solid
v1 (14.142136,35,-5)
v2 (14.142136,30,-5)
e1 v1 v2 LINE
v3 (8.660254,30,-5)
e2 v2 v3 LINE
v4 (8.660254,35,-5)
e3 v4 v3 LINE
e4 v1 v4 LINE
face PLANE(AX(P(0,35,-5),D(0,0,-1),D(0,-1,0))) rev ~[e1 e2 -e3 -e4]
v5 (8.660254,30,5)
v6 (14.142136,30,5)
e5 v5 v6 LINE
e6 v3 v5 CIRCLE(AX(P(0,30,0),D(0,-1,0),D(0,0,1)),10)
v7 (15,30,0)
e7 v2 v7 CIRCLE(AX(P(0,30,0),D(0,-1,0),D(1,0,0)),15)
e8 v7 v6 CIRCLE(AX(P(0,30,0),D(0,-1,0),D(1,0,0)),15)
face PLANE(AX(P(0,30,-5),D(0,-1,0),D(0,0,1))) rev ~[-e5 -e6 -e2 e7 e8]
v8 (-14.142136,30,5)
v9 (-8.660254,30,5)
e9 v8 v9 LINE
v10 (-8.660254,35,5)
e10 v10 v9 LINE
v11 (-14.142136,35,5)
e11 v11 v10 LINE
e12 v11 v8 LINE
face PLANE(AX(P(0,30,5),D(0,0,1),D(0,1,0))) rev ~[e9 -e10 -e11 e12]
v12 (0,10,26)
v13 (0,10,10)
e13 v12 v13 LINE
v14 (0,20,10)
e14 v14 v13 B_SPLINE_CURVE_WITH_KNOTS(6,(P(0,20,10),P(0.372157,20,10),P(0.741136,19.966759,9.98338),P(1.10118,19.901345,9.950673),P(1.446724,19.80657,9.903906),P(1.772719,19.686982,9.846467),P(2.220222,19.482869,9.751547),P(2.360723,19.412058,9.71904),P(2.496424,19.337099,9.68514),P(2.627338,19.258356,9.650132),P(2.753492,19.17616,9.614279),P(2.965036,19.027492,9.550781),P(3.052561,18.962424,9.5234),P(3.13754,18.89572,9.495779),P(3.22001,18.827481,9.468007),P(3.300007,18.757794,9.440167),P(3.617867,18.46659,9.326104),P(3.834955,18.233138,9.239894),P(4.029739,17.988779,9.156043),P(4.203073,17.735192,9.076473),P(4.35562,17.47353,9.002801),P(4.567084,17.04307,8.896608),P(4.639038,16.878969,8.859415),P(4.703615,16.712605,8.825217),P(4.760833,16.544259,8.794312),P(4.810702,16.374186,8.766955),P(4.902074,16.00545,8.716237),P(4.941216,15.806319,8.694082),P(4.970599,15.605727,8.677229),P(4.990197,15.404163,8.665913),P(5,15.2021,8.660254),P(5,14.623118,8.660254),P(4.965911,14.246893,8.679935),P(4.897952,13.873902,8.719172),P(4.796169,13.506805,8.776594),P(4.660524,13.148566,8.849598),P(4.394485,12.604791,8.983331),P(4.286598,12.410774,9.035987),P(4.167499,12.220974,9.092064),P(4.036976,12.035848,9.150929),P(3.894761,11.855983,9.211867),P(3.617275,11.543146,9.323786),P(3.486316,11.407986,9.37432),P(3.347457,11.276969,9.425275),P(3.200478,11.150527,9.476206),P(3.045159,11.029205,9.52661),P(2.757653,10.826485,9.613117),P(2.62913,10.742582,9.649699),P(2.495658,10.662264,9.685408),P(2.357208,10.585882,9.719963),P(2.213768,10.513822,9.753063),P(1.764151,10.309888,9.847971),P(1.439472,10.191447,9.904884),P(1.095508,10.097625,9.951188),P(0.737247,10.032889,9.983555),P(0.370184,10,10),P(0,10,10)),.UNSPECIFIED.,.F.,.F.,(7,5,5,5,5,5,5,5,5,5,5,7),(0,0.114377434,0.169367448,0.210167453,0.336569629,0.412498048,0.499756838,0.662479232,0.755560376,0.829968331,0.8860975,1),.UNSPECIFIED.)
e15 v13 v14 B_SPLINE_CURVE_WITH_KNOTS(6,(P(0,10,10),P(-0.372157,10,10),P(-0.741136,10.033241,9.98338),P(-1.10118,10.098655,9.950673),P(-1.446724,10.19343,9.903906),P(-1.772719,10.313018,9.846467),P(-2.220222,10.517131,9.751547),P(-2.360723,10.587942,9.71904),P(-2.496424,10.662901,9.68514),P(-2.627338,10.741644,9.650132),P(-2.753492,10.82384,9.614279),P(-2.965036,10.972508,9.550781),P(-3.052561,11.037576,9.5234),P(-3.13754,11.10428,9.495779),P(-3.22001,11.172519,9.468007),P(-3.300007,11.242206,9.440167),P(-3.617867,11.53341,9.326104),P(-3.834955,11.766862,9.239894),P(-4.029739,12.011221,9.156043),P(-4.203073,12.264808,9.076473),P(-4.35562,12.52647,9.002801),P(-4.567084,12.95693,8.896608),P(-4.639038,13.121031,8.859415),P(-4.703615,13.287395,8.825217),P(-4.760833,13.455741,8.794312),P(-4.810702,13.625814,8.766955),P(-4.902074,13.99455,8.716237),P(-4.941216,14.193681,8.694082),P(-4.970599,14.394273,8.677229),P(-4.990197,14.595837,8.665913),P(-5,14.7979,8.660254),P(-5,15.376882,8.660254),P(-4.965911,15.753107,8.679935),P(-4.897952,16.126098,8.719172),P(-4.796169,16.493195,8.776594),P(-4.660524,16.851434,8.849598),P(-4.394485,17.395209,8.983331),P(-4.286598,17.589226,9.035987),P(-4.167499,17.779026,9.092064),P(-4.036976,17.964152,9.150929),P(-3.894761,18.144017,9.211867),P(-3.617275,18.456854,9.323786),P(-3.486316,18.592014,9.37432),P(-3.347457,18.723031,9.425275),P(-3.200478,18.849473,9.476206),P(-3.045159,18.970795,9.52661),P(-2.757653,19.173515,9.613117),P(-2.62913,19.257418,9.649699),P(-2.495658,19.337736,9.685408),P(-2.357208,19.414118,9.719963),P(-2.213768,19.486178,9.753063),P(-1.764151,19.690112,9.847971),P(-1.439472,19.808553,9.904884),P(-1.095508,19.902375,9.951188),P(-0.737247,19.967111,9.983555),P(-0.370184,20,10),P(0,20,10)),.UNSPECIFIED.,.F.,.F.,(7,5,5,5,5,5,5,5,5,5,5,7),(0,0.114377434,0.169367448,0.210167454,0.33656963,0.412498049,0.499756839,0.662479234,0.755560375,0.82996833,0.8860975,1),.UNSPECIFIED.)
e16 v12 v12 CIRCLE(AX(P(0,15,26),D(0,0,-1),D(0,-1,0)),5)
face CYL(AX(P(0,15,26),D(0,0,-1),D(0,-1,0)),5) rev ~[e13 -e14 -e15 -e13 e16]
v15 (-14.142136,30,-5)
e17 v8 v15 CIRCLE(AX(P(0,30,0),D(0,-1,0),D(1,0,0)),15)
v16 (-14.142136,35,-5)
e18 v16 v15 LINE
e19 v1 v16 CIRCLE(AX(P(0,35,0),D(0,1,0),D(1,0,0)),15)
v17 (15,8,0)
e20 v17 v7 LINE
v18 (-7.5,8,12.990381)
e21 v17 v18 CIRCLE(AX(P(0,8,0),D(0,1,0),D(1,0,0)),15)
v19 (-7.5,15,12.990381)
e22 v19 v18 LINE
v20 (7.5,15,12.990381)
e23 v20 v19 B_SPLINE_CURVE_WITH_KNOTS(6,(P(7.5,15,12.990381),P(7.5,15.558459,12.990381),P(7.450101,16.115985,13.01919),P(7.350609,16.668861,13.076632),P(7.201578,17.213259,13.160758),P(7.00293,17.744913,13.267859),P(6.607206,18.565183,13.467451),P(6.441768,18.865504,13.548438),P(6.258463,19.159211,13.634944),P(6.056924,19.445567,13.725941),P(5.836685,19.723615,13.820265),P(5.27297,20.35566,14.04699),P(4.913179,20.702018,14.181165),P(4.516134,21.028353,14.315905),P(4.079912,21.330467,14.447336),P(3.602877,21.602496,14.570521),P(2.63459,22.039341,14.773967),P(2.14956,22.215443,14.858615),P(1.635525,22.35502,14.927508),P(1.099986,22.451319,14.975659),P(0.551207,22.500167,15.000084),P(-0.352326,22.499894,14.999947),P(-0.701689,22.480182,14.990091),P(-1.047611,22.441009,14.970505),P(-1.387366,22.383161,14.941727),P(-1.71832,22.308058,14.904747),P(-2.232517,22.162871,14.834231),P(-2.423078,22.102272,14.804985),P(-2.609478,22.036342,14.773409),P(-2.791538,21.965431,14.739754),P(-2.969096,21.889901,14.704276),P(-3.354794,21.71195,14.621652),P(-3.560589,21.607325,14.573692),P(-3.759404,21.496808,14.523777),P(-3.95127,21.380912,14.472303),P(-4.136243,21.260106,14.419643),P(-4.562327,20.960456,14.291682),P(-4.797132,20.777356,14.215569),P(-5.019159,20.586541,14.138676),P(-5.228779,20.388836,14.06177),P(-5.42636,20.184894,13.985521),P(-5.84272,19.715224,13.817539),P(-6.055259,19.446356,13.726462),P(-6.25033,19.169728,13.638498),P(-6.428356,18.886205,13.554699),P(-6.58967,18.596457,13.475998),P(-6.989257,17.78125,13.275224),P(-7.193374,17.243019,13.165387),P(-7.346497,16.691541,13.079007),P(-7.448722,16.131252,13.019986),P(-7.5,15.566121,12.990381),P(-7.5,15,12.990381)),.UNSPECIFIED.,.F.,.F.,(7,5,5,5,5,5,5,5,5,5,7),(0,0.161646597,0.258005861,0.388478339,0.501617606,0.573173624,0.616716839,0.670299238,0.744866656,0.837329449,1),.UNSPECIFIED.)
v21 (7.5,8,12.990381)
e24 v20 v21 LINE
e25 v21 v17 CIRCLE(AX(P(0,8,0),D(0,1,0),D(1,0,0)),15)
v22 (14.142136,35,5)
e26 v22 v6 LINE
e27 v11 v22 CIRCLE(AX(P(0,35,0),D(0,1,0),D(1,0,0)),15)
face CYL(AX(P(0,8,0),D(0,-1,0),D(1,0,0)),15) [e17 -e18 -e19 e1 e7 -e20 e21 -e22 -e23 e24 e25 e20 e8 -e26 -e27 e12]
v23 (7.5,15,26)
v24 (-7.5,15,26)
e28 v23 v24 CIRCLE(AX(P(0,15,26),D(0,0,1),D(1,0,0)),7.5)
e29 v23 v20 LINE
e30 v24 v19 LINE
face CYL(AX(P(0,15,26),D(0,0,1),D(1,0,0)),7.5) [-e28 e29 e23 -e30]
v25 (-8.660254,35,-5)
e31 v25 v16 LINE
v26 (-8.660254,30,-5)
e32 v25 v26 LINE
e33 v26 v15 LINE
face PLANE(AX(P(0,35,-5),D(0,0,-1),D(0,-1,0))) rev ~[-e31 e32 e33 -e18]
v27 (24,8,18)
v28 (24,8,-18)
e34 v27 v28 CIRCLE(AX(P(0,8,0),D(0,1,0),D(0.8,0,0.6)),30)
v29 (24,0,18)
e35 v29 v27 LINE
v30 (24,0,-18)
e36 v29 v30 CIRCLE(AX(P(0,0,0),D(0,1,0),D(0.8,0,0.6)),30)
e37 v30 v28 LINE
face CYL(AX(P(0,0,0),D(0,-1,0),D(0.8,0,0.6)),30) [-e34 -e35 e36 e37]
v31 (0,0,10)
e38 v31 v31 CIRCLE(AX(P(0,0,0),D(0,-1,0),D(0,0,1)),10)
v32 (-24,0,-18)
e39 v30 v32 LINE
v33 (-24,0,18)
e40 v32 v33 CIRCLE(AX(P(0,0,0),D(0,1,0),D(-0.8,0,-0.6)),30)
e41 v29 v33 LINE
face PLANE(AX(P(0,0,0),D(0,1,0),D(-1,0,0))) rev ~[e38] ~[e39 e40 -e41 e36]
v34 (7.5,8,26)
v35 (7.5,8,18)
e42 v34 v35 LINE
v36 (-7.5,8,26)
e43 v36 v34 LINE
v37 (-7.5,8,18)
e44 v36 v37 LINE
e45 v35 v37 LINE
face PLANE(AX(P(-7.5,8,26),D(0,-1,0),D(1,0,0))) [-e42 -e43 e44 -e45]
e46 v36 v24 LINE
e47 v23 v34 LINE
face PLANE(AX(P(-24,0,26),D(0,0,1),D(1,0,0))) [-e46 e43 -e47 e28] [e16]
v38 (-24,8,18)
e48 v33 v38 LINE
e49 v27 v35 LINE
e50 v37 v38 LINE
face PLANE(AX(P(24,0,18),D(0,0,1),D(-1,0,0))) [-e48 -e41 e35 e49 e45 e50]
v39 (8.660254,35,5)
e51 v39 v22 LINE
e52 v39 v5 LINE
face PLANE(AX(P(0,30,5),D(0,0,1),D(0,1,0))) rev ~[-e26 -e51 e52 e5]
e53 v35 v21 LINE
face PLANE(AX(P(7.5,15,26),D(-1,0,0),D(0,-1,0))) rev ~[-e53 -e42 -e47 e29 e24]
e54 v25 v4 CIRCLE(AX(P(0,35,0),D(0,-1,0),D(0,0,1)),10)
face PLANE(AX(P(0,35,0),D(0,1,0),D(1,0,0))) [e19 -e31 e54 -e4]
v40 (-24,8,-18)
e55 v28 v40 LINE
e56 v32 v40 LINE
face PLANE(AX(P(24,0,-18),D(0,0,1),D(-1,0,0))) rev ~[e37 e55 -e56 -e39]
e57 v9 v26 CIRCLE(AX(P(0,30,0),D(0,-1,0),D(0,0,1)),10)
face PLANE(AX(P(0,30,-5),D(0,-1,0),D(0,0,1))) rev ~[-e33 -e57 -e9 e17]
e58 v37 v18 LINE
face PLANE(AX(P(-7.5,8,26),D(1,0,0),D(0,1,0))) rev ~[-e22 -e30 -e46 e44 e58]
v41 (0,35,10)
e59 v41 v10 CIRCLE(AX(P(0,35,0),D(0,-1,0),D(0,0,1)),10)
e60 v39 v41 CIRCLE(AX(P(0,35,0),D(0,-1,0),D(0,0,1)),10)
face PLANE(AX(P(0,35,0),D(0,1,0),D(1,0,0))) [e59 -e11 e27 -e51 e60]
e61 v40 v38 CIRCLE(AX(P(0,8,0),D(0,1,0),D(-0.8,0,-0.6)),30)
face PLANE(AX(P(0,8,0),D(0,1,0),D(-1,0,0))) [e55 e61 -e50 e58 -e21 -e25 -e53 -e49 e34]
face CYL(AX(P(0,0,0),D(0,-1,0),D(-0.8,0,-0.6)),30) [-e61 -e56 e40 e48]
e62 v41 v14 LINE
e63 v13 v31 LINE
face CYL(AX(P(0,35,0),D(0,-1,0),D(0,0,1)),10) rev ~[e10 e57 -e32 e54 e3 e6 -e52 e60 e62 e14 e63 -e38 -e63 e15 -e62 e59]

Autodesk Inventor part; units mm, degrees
ref_plane "YZ Plane" through (0, 0, 0) normal (1, 0, 0) x (0, 1, 0)
ref_plane "XZ Plane" through (0, 0, 0) normal (0, 1, 0) x (-1, 0, 0)
ref_plane "XY Plane" through (0, 0, 0) normal (0, 0, 1) x (1, 0, 0)
sketch "草图1" plane through (0, 0, 0) normal (0, 1, 0) x (-1, 0, 0)
  line L0 (-24, 18) -> (24, 18)
  line L1 (24, 0) -> (39.8795, 0) construction
  line L2 (-24, -18) -> (24, -18)
  arc A0 (-24, 18) -> (-24, -18) centre (0, 0) ccw
  arc A1 (24, -18) -> (24, 18) centre (0, 0) ccw
  dimension "d9" = 18
  dimension "d10" = 30
extrude "拉伸1" add sketch "草图1" along normal blind 8
sketch "草图2" plane through (0, 8, 0) normal (0, 1, 0) x (1, 0, 0)
  arc A0 (-24, 18) -> (-24, -18) centre (0, 0) ccw projected
  circle A1 centre (0, 0) radius 15
  dimension "d13" = 30
extrude "拉伸2" add sketch "草图2" along normal blind 27
hole "孔1" at (0, 35, 0) direction (0, -1, 0) diameter 20 end through all
ref_plane "工作平面1" through (-24, 0, 26) normal (0, 0, 1) x (1, 0, 0)
sketch "草图3" plane through (-24, 0, 26) normal (0, 0, 1) x (1, 0, 0)
  line L0 (0, 8) -> (48, 8) projected
  line L1 (16.5, 8) -> (16.5, 15)
  arc A0 (31.5, 15) -> (16.5, 15) centre (24, 15) ccw
  line L2 (31.5, 15) -> (31.5, 8)
  point P0 (24, 0)
  dimension "d27" = 7
  dimension "d29" = 7.5
extrude "拉伸3" add sketch "草图3" against normal up to surface
hole "孔2" at (0, 15, 26) direction (0, 0, -1) diameter 10 end up to surface
sketch "草图4" plane through (0, 0, 0) normal (1, 0, 0) x (0, 1, 0)
  line L0 (35, 10) -> (35, -10) projected
  line L1 (30, 5) -> (35, 5)
  line L2 (35, 5) -> (35, -5)
  line L3 (35, -5) -> (30, -5)
  line L4 (30, -5) -> (30, 5)
  line L5 (6.6641, 0) -> (11.8794, 0) construction
  point P0 (0, 0)
  dimension "d41" = 5
  dimension "d43" = 10
extrude "拉伸4" cut sketch "草图4" along normal through all both and the other way through all
properties part number "第一次上机-模型3（改）"
